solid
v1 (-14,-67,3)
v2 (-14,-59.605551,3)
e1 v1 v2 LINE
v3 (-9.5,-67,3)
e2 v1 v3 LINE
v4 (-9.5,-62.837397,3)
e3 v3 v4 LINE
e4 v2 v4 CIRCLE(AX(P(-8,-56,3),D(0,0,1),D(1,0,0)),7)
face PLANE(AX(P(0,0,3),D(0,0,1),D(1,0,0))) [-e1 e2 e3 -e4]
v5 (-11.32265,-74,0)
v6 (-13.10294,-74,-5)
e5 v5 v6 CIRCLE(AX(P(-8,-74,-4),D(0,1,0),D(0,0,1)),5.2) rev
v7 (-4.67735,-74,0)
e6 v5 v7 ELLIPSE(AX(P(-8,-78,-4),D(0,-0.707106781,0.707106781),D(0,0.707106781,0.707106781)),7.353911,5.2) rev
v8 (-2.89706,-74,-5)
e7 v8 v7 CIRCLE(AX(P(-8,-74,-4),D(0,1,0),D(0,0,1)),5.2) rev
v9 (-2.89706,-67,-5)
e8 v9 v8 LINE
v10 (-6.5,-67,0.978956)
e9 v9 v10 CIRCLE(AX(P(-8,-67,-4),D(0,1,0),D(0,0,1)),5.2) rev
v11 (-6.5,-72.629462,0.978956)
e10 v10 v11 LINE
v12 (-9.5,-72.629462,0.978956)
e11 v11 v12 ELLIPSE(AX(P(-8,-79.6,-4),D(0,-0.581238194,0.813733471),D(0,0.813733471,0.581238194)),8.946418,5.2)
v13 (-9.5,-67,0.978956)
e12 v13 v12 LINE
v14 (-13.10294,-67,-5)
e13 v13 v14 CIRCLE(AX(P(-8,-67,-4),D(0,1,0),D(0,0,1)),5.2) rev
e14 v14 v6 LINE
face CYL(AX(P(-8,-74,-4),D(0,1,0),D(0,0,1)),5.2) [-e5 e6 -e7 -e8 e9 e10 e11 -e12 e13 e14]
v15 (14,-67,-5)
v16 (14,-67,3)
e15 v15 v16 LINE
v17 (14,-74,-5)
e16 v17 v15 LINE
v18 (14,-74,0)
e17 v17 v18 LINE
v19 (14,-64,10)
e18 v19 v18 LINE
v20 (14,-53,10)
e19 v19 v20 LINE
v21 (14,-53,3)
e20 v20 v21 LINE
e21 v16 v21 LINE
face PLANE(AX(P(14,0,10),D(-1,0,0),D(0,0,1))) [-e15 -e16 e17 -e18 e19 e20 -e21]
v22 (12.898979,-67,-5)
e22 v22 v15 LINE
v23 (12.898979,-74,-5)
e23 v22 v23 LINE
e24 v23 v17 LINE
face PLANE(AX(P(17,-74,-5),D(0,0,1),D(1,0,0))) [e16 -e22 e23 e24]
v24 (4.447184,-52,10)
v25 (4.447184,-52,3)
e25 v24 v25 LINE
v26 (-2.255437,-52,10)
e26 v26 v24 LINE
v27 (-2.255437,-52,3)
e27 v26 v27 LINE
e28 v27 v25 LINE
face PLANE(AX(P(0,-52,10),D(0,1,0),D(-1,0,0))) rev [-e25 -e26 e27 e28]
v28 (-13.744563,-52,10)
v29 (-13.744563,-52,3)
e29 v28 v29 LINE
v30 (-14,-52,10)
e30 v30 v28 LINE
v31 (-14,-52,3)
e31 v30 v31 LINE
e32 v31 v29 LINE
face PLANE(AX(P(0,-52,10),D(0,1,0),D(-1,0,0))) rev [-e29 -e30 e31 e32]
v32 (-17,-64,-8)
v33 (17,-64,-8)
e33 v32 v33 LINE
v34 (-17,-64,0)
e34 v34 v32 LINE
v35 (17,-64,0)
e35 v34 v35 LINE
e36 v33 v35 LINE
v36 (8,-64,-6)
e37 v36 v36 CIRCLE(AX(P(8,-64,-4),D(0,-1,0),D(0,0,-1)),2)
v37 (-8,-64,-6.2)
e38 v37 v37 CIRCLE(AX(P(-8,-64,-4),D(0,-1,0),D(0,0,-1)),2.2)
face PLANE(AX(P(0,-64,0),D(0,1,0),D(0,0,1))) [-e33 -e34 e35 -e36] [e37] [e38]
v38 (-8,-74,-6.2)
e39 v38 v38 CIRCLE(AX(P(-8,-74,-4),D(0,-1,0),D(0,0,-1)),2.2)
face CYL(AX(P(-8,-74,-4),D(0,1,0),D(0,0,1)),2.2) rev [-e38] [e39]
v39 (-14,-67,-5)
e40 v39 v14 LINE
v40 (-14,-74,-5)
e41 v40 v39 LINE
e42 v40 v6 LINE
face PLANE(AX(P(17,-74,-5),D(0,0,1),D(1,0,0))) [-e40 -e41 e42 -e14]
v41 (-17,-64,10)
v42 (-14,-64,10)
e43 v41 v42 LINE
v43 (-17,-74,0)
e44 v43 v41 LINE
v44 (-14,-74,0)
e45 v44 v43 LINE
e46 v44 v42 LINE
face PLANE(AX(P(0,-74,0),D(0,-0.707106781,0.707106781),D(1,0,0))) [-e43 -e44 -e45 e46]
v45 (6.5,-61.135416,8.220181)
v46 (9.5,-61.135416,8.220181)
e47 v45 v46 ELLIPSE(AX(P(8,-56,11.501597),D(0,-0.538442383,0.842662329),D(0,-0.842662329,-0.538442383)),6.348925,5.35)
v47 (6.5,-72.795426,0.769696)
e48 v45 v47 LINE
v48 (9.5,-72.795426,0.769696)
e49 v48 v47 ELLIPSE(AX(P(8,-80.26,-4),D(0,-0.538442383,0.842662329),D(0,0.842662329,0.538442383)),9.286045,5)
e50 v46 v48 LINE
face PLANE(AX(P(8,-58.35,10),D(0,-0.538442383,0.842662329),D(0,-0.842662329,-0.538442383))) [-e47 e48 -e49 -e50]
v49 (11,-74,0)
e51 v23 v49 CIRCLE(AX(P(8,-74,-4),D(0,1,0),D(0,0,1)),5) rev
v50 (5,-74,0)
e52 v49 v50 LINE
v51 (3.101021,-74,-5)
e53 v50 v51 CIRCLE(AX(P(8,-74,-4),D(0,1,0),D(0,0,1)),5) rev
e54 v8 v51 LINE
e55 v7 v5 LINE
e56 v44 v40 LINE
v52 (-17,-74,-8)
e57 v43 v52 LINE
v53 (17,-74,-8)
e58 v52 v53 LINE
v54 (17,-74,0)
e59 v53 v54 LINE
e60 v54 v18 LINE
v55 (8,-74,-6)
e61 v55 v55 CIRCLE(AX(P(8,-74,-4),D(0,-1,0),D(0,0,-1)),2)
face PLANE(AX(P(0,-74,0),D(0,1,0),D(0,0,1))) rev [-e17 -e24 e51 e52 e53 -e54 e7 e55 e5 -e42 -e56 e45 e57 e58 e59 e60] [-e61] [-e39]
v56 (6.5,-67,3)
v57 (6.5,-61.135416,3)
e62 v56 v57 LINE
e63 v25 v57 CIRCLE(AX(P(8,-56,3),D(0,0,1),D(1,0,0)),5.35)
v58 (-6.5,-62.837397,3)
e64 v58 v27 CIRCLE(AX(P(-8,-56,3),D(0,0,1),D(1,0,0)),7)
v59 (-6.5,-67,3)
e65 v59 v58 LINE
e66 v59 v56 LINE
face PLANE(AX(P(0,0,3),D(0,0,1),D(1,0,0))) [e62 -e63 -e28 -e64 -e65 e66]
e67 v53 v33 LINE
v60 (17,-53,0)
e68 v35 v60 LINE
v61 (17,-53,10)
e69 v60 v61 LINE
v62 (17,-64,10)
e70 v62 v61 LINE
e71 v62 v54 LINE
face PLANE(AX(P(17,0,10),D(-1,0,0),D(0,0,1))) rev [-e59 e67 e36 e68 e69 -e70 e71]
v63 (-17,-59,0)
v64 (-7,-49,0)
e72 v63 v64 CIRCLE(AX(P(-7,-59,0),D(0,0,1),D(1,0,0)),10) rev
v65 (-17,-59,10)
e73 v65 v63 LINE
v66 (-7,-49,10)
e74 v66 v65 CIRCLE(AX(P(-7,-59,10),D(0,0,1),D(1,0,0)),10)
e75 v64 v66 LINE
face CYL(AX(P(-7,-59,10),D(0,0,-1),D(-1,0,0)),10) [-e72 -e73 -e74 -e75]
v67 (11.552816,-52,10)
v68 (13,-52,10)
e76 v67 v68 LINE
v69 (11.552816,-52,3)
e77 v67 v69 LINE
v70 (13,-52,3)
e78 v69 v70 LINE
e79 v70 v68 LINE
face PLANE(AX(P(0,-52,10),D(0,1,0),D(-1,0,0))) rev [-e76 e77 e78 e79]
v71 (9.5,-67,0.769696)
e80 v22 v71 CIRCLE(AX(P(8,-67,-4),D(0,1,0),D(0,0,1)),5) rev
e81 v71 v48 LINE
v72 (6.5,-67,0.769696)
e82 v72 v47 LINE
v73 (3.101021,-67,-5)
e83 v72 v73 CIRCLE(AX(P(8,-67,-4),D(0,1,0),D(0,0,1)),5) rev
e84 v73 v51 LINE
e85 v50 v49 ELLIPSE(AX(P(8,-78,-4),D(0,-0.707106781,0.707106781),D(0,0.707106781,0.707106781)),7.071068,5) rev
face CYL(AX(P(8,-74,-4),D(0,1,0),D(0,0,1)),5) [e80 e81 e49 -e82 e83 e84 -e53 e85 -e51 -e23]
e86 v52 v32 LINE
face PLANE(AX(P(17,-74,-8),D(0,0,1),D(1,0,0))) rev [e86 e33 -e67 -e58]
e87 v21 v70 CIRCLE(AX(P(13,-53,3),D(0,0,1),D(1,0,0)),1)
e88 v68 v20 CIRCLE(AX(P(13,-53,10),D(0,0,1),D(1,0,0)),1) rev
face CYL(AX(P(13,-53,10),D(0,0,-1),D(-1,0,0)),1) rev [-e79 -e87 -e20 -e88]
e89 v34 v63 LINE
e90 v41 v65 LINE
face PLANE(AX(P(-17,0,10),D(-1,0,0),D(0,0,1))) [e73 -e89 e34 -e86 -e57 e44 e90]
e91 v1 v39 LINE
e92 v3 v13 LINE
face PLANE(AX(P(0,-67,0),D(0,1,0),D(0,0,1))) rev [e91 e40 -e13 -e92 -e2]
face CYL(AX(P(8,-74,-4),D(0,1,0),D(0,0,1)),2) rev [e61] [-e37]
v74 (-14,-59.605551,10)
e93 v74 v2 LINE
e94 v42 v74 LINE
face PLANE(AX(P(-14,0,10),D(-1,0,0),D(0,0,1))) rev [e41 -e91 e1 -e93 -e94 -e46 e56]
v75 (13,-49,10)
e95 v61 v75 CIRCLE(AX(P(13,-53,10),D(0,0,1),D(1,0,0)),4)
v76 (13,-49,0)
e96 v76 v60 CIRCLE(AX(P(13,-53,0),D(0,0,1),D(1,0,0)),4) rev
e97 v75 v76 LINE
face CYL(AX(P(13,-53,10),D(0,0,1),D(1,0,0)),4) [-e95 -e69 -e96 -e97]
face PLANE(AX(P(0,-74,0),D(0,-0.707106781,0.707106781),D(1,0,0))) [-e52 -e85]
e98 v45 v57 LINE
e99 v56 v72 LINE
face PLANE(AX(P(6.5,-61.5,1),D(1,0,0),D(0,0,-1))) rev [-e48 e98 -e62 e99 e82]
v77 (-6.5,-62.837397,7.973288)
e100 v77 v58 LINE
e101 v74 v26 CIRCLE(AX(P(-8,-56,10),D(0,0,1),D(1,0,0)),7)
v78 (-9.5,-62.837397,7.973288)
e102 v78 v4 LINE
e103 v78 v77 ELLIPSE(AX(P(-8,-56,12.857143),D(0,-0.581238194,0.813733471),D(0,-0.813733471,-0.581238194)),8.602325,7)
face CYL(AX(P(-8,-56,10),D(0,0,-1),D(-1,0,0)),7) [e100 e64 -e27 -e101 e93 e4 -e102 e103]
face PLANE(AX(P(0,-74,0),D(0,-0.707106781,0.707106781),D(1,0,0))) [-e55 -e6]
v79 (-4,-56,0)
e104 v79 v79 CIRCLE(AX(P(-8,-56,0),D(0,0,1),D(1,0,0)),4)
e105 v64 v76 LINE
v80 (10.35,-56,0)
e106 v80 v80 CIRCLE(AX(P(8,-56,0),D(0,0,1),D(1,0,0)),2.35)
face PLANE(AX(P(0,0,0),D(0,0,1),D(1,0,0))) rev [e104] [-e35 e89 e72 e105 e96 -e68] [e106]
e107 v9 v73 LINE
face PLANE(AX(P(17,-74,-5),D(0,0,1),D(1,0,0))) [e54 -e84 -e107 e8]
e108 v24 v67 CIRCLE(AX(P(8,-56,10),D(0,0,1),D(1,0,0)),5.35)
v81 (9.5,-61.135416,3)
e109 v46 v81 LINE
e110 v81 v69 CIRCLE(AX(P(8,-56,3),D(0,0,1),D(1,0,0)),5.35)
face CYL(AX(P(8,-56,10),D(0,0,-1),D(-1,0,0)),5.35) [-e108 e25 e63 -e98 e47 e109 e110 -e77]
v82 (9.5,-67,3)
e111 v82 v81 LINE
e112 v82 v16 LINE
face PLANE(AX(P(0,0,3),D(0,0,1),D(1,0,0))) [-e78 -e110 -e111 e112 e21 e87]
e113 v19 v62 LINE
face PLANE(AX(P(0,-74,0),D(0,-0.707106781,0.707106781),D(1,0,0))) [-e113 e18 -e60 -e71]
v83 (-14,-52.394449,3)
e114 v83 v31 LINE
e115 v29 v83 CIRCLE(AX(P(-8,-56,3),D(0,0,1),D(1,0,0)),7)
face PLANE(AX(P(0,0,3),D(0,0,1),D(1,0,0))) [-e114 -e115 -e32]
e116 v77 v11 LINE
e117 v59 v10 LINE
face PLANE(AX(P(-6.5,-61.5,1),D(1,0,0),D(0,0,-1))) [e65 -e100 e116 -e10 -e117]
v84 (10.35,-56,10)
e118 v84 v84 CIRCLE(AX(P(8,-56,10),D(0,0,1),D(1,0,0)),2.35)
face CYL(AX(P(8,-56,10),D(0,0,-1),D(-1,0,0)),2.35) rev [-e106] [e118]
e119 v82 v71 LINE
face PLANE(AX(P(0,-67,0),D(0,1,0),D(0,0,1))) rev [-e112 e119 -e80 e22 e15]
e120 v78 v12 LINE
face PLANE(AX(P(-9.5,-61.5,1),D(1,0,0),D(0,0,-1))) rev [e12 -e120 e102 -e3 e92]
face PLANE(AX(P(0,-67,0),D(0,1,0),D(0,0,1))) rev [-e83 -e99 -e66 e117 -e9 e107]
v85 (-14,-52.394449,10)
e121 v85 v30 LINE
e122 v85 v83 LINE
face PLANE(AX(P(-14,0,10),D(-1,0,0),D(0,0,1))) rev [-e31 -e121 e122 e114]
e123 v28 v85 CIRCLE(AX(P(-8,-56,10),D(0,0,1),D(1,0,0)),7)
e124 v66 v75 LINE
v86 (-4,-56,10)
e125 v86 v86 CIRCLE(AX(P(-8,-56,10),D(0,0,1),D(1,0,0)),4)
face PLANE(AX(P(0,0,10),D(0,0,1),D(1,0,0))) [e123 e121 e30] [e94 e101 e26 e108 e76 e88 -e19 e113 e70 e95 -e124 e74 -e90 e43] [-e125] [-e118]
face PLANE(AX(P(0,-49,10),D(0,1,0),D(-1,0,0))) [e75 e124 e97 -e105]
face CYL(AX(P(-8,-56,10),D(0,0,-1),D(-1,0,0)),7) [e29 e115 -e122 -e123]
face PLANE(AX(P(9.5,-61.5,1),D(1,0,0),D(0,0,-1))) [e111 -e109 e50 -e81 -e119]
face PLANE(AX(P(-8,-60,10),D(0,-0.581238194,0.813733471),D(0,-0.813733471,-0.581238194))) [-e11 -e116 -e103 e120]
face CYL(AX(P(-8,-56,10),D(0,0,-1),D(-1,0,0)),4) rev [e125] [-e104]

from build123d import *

# Parameters (mm, degrees)
ESQUISSE1_W        = 34
ESQUISSE1_H        = 15
ESQUISSE1_R        = 2.35
ESQUISSE1_R_2      = 4
BOSS_EXTRU_1_DEPTH = 10
ESQUISSE2_W        = 34
ESQUISSE2_H        = 18
ESQUISSE2_R        = 2.2
ESQUISSE2_R_2      = 2
BOSS_EXTRU_2_DEPTH = 10
CHANFREIN2_SIZE    = 10
COQUE1_START       = 3
COQUE1_DEPTH       = 7
COQUE1_START_2     = 1.2
COQUE1_2_OUTLINE_W = 28
COQUE1_2_OUTLINE_H = 7
COQUE1_2_DEPTH     = 1.8
COQUE1_START_3     = -74
COQUE1_3_DEPTH     = 7
CONG_1_R           = 10
CONG_3_R           = 1
CONG_4_R           = 4
NERVURE3_REACH     = 80.746
ESQUISSE4_WALL_W   = 176.697507514
ESQUISSE4_WALL_H   = 3
NERVURE5_REACH     = 80.746
ESQUISSE5_WALL_W   = 178.064946254
ESQUISSE5_WALL_H   = 3


with BuildPart() as part:
    # Esquisse1 → Boss.-Extru.1 (new body)
    with BuildSketch(Plane.XY):
        with Locations((0, -56.5)):
            Rectangle(ESQUISSE1_W, ESQUISSE1_H)
        with Locations((8, -56)):
            Circle(ESQUISSE1_R, mode=Mode.SUBTRACT)
        with Locations((-8, -56)):
            Circle(ESQUISSE1_R_2, mode=Mode.SUBTRACT)
    extrude(amount=BOSS_EXTRU_1_DEPTH)

    # Esquisse2 → Boss.-Extru.2 (add)
    with BuildSketch(Plane.XZ.offset(64)):
        with Locations((0, 1)):
            Rectangle(ESQUISSE2_W, ESQUISSE2_H)
        with Locations(Location((-8, -4, 0), (0, 0, 270))):
            Circle(ESQUISSE2_R, mode=Mode.SUBTRACT)
        with Locations(Location((8, -4, 0), (0, 0, 270))):
            Circle(ESQUISSE2_R_2, mode=Mode.SUBTRACT)
    extrude(amount=BOSS_EXTRU_2_DEPTH)

    # Chanfrein2
    chanfrein2_edges = [part.edges().sort_by_distance(p)[0] for p in [
        (0, -74, 10),
    ]]
    chamfer(chanfrein2_edges, length=CHANFREIN2_SIZE)

    # Coque1: read off the stored shape, not the designer's step
    # Coque1 outline → Coque1 (cut)
    with BuildSketch(Plane.XY.offset(COQUE1_START)):
        with BuildLine():
            Line((14, -74), (14, -52))
            Line((14, -52), (11.552815785, -52))
            ThreePointArc((11.552815785, -52), (8, -61.35), (4.447184215, -52))
            Line((4.447184215, -52), (-2.255437353, -52))
            ThreePointArc((-2.255437353, -52), (-4.19508021, -61.875592344), (-14, -59.605551275))
            Line((-14, -59.605551275), (-14, -74))
            Line((-14, -74), (14, -74))
        make_face()
        with BuildLine():
            ThreePointArc((-14, -52.394448725), (-13.875592344, -52.19508021), (-13.744562647, -52))
            Line((-13.744562647, -52), (-14, -52))
            Line((-14, -52), (-14, -52.394448725))
        make_face()
    extrude(amount=COQUE1_DEPTH, mode=Mode.SUBTRACT)

    # Coque1 2 outline → Coque1 2 (cut)
    with BuildSketch(Plane.XY.offset(COQUE1_START_2)):
        with Locations((0, -70.5)):
            Rectangle(COQUE1_2_OUTLINE_W, COQUE1_2_OUTLINE_H)
    extrude(amount=COQUE1_2_DEPTH, mode=Mode.SUBTRACT)

    # Coque1 3 outline → Coque1 3 (cut)
    with BuildSketch(Plane(origin=(0, 0, 0), x_dir=(1, 0, 0), z_dir=(0, 1, 0)).offset(COQUE1_START_3)):
        with BuildLine():
            ThreePointArc((-2.897059671, 5), (-3.98502802, 0.695457672), (-8, -1.2))
            Line((-8, -1.2), (14, -1.2))
            Line((14, -1.2), (14, 5))
            Line((14, 5), (12.898979486, 5))
            ThreePointArc((12.898979486, 5), (8, -1), (3.101020514, 5))
            Line((3.101020514, 5), (-2.897059671, 5))
        make_face()
        with BuildLine():
            ThreePointArc((-8, -1.2), (-12.01497198, 0.695457672), (-13.102940329, 5))
            Line((-13.102940329, 5), (-14, 5))
            Line((-14, 5), (-14, -1.2))
            Line((-14, -1.2), (-8, -1.2))
        make_face()
    extrude(amount=COQUE1_3_DEPTH, mode=Mode.SUBTRACT)

    # Congé1
    cong_1_edges = [part.edges().sort_by_distance(p)[0] for p in [
        (-17, -49, 5),
    ]]
    fillet(cong_1_edges, radius=CONG_1_R)

    # Congé3
    cong_3_edges = [part.edges().sort_by_distance(p)[0] for p in [
        (14, -52, 6.5),
    ]]
    fillet(cong_3_edges, radius=CONG_3_R)

    # Congé4
    cong_4_edges = [part.edges().sort_by_distance(p)[0] for p in [
        (17, -49, 5),
    ]]
    fillet(cong_4_edges, radius=CONG_4_R)

    # Esquisse4 wall → Nervure3 (add, up to next)
    with BuildSketch(Plane(origin=(-8, -67, 5), x_dir=(0, -0.813733471207, -0.581238193719), z_dir=(0, 0.581238193719, -0.813733471207)), mode=Mode.PRIVATE) as nervure3_sk1:
        Rectangle(ESQUISSE4_WALL_W, ESQUISSE4_WALL_H)
    nervure3_tool1 = extrude(nervure3_sk1.sketch, amount=NERVURE3_REACH, mode=Mode.PRIVATE) - part.part
    add(nervure3_tool1.solids().sort_by_distance((-8, -67, 5))[0])

    # Esquisse5 wall → Nervure5 (add, up to next)
    with BuildSketch(Plane(origin=(8, -66.175, 5), x_dir=(0, -0.842662328893, -0.538442382679), z_dir=(0, 0.538442382679, -0.842662328893)), mode=Mode.PRIVATE) as nervure5_sk1:
        Rectangle(ESQUISSE5_WALL_W, ESQUISSE5_WALL_H)
    nervure5_tool1 = extrude(nervure5_sk1.sketch, amount=NERVURE5_REACH, mode=Mode.PRIVATE) - part.part
    add(nervure5_tool1.solids().sort_by_distance((8, -66.175, 5))[0])


solid = part.part
